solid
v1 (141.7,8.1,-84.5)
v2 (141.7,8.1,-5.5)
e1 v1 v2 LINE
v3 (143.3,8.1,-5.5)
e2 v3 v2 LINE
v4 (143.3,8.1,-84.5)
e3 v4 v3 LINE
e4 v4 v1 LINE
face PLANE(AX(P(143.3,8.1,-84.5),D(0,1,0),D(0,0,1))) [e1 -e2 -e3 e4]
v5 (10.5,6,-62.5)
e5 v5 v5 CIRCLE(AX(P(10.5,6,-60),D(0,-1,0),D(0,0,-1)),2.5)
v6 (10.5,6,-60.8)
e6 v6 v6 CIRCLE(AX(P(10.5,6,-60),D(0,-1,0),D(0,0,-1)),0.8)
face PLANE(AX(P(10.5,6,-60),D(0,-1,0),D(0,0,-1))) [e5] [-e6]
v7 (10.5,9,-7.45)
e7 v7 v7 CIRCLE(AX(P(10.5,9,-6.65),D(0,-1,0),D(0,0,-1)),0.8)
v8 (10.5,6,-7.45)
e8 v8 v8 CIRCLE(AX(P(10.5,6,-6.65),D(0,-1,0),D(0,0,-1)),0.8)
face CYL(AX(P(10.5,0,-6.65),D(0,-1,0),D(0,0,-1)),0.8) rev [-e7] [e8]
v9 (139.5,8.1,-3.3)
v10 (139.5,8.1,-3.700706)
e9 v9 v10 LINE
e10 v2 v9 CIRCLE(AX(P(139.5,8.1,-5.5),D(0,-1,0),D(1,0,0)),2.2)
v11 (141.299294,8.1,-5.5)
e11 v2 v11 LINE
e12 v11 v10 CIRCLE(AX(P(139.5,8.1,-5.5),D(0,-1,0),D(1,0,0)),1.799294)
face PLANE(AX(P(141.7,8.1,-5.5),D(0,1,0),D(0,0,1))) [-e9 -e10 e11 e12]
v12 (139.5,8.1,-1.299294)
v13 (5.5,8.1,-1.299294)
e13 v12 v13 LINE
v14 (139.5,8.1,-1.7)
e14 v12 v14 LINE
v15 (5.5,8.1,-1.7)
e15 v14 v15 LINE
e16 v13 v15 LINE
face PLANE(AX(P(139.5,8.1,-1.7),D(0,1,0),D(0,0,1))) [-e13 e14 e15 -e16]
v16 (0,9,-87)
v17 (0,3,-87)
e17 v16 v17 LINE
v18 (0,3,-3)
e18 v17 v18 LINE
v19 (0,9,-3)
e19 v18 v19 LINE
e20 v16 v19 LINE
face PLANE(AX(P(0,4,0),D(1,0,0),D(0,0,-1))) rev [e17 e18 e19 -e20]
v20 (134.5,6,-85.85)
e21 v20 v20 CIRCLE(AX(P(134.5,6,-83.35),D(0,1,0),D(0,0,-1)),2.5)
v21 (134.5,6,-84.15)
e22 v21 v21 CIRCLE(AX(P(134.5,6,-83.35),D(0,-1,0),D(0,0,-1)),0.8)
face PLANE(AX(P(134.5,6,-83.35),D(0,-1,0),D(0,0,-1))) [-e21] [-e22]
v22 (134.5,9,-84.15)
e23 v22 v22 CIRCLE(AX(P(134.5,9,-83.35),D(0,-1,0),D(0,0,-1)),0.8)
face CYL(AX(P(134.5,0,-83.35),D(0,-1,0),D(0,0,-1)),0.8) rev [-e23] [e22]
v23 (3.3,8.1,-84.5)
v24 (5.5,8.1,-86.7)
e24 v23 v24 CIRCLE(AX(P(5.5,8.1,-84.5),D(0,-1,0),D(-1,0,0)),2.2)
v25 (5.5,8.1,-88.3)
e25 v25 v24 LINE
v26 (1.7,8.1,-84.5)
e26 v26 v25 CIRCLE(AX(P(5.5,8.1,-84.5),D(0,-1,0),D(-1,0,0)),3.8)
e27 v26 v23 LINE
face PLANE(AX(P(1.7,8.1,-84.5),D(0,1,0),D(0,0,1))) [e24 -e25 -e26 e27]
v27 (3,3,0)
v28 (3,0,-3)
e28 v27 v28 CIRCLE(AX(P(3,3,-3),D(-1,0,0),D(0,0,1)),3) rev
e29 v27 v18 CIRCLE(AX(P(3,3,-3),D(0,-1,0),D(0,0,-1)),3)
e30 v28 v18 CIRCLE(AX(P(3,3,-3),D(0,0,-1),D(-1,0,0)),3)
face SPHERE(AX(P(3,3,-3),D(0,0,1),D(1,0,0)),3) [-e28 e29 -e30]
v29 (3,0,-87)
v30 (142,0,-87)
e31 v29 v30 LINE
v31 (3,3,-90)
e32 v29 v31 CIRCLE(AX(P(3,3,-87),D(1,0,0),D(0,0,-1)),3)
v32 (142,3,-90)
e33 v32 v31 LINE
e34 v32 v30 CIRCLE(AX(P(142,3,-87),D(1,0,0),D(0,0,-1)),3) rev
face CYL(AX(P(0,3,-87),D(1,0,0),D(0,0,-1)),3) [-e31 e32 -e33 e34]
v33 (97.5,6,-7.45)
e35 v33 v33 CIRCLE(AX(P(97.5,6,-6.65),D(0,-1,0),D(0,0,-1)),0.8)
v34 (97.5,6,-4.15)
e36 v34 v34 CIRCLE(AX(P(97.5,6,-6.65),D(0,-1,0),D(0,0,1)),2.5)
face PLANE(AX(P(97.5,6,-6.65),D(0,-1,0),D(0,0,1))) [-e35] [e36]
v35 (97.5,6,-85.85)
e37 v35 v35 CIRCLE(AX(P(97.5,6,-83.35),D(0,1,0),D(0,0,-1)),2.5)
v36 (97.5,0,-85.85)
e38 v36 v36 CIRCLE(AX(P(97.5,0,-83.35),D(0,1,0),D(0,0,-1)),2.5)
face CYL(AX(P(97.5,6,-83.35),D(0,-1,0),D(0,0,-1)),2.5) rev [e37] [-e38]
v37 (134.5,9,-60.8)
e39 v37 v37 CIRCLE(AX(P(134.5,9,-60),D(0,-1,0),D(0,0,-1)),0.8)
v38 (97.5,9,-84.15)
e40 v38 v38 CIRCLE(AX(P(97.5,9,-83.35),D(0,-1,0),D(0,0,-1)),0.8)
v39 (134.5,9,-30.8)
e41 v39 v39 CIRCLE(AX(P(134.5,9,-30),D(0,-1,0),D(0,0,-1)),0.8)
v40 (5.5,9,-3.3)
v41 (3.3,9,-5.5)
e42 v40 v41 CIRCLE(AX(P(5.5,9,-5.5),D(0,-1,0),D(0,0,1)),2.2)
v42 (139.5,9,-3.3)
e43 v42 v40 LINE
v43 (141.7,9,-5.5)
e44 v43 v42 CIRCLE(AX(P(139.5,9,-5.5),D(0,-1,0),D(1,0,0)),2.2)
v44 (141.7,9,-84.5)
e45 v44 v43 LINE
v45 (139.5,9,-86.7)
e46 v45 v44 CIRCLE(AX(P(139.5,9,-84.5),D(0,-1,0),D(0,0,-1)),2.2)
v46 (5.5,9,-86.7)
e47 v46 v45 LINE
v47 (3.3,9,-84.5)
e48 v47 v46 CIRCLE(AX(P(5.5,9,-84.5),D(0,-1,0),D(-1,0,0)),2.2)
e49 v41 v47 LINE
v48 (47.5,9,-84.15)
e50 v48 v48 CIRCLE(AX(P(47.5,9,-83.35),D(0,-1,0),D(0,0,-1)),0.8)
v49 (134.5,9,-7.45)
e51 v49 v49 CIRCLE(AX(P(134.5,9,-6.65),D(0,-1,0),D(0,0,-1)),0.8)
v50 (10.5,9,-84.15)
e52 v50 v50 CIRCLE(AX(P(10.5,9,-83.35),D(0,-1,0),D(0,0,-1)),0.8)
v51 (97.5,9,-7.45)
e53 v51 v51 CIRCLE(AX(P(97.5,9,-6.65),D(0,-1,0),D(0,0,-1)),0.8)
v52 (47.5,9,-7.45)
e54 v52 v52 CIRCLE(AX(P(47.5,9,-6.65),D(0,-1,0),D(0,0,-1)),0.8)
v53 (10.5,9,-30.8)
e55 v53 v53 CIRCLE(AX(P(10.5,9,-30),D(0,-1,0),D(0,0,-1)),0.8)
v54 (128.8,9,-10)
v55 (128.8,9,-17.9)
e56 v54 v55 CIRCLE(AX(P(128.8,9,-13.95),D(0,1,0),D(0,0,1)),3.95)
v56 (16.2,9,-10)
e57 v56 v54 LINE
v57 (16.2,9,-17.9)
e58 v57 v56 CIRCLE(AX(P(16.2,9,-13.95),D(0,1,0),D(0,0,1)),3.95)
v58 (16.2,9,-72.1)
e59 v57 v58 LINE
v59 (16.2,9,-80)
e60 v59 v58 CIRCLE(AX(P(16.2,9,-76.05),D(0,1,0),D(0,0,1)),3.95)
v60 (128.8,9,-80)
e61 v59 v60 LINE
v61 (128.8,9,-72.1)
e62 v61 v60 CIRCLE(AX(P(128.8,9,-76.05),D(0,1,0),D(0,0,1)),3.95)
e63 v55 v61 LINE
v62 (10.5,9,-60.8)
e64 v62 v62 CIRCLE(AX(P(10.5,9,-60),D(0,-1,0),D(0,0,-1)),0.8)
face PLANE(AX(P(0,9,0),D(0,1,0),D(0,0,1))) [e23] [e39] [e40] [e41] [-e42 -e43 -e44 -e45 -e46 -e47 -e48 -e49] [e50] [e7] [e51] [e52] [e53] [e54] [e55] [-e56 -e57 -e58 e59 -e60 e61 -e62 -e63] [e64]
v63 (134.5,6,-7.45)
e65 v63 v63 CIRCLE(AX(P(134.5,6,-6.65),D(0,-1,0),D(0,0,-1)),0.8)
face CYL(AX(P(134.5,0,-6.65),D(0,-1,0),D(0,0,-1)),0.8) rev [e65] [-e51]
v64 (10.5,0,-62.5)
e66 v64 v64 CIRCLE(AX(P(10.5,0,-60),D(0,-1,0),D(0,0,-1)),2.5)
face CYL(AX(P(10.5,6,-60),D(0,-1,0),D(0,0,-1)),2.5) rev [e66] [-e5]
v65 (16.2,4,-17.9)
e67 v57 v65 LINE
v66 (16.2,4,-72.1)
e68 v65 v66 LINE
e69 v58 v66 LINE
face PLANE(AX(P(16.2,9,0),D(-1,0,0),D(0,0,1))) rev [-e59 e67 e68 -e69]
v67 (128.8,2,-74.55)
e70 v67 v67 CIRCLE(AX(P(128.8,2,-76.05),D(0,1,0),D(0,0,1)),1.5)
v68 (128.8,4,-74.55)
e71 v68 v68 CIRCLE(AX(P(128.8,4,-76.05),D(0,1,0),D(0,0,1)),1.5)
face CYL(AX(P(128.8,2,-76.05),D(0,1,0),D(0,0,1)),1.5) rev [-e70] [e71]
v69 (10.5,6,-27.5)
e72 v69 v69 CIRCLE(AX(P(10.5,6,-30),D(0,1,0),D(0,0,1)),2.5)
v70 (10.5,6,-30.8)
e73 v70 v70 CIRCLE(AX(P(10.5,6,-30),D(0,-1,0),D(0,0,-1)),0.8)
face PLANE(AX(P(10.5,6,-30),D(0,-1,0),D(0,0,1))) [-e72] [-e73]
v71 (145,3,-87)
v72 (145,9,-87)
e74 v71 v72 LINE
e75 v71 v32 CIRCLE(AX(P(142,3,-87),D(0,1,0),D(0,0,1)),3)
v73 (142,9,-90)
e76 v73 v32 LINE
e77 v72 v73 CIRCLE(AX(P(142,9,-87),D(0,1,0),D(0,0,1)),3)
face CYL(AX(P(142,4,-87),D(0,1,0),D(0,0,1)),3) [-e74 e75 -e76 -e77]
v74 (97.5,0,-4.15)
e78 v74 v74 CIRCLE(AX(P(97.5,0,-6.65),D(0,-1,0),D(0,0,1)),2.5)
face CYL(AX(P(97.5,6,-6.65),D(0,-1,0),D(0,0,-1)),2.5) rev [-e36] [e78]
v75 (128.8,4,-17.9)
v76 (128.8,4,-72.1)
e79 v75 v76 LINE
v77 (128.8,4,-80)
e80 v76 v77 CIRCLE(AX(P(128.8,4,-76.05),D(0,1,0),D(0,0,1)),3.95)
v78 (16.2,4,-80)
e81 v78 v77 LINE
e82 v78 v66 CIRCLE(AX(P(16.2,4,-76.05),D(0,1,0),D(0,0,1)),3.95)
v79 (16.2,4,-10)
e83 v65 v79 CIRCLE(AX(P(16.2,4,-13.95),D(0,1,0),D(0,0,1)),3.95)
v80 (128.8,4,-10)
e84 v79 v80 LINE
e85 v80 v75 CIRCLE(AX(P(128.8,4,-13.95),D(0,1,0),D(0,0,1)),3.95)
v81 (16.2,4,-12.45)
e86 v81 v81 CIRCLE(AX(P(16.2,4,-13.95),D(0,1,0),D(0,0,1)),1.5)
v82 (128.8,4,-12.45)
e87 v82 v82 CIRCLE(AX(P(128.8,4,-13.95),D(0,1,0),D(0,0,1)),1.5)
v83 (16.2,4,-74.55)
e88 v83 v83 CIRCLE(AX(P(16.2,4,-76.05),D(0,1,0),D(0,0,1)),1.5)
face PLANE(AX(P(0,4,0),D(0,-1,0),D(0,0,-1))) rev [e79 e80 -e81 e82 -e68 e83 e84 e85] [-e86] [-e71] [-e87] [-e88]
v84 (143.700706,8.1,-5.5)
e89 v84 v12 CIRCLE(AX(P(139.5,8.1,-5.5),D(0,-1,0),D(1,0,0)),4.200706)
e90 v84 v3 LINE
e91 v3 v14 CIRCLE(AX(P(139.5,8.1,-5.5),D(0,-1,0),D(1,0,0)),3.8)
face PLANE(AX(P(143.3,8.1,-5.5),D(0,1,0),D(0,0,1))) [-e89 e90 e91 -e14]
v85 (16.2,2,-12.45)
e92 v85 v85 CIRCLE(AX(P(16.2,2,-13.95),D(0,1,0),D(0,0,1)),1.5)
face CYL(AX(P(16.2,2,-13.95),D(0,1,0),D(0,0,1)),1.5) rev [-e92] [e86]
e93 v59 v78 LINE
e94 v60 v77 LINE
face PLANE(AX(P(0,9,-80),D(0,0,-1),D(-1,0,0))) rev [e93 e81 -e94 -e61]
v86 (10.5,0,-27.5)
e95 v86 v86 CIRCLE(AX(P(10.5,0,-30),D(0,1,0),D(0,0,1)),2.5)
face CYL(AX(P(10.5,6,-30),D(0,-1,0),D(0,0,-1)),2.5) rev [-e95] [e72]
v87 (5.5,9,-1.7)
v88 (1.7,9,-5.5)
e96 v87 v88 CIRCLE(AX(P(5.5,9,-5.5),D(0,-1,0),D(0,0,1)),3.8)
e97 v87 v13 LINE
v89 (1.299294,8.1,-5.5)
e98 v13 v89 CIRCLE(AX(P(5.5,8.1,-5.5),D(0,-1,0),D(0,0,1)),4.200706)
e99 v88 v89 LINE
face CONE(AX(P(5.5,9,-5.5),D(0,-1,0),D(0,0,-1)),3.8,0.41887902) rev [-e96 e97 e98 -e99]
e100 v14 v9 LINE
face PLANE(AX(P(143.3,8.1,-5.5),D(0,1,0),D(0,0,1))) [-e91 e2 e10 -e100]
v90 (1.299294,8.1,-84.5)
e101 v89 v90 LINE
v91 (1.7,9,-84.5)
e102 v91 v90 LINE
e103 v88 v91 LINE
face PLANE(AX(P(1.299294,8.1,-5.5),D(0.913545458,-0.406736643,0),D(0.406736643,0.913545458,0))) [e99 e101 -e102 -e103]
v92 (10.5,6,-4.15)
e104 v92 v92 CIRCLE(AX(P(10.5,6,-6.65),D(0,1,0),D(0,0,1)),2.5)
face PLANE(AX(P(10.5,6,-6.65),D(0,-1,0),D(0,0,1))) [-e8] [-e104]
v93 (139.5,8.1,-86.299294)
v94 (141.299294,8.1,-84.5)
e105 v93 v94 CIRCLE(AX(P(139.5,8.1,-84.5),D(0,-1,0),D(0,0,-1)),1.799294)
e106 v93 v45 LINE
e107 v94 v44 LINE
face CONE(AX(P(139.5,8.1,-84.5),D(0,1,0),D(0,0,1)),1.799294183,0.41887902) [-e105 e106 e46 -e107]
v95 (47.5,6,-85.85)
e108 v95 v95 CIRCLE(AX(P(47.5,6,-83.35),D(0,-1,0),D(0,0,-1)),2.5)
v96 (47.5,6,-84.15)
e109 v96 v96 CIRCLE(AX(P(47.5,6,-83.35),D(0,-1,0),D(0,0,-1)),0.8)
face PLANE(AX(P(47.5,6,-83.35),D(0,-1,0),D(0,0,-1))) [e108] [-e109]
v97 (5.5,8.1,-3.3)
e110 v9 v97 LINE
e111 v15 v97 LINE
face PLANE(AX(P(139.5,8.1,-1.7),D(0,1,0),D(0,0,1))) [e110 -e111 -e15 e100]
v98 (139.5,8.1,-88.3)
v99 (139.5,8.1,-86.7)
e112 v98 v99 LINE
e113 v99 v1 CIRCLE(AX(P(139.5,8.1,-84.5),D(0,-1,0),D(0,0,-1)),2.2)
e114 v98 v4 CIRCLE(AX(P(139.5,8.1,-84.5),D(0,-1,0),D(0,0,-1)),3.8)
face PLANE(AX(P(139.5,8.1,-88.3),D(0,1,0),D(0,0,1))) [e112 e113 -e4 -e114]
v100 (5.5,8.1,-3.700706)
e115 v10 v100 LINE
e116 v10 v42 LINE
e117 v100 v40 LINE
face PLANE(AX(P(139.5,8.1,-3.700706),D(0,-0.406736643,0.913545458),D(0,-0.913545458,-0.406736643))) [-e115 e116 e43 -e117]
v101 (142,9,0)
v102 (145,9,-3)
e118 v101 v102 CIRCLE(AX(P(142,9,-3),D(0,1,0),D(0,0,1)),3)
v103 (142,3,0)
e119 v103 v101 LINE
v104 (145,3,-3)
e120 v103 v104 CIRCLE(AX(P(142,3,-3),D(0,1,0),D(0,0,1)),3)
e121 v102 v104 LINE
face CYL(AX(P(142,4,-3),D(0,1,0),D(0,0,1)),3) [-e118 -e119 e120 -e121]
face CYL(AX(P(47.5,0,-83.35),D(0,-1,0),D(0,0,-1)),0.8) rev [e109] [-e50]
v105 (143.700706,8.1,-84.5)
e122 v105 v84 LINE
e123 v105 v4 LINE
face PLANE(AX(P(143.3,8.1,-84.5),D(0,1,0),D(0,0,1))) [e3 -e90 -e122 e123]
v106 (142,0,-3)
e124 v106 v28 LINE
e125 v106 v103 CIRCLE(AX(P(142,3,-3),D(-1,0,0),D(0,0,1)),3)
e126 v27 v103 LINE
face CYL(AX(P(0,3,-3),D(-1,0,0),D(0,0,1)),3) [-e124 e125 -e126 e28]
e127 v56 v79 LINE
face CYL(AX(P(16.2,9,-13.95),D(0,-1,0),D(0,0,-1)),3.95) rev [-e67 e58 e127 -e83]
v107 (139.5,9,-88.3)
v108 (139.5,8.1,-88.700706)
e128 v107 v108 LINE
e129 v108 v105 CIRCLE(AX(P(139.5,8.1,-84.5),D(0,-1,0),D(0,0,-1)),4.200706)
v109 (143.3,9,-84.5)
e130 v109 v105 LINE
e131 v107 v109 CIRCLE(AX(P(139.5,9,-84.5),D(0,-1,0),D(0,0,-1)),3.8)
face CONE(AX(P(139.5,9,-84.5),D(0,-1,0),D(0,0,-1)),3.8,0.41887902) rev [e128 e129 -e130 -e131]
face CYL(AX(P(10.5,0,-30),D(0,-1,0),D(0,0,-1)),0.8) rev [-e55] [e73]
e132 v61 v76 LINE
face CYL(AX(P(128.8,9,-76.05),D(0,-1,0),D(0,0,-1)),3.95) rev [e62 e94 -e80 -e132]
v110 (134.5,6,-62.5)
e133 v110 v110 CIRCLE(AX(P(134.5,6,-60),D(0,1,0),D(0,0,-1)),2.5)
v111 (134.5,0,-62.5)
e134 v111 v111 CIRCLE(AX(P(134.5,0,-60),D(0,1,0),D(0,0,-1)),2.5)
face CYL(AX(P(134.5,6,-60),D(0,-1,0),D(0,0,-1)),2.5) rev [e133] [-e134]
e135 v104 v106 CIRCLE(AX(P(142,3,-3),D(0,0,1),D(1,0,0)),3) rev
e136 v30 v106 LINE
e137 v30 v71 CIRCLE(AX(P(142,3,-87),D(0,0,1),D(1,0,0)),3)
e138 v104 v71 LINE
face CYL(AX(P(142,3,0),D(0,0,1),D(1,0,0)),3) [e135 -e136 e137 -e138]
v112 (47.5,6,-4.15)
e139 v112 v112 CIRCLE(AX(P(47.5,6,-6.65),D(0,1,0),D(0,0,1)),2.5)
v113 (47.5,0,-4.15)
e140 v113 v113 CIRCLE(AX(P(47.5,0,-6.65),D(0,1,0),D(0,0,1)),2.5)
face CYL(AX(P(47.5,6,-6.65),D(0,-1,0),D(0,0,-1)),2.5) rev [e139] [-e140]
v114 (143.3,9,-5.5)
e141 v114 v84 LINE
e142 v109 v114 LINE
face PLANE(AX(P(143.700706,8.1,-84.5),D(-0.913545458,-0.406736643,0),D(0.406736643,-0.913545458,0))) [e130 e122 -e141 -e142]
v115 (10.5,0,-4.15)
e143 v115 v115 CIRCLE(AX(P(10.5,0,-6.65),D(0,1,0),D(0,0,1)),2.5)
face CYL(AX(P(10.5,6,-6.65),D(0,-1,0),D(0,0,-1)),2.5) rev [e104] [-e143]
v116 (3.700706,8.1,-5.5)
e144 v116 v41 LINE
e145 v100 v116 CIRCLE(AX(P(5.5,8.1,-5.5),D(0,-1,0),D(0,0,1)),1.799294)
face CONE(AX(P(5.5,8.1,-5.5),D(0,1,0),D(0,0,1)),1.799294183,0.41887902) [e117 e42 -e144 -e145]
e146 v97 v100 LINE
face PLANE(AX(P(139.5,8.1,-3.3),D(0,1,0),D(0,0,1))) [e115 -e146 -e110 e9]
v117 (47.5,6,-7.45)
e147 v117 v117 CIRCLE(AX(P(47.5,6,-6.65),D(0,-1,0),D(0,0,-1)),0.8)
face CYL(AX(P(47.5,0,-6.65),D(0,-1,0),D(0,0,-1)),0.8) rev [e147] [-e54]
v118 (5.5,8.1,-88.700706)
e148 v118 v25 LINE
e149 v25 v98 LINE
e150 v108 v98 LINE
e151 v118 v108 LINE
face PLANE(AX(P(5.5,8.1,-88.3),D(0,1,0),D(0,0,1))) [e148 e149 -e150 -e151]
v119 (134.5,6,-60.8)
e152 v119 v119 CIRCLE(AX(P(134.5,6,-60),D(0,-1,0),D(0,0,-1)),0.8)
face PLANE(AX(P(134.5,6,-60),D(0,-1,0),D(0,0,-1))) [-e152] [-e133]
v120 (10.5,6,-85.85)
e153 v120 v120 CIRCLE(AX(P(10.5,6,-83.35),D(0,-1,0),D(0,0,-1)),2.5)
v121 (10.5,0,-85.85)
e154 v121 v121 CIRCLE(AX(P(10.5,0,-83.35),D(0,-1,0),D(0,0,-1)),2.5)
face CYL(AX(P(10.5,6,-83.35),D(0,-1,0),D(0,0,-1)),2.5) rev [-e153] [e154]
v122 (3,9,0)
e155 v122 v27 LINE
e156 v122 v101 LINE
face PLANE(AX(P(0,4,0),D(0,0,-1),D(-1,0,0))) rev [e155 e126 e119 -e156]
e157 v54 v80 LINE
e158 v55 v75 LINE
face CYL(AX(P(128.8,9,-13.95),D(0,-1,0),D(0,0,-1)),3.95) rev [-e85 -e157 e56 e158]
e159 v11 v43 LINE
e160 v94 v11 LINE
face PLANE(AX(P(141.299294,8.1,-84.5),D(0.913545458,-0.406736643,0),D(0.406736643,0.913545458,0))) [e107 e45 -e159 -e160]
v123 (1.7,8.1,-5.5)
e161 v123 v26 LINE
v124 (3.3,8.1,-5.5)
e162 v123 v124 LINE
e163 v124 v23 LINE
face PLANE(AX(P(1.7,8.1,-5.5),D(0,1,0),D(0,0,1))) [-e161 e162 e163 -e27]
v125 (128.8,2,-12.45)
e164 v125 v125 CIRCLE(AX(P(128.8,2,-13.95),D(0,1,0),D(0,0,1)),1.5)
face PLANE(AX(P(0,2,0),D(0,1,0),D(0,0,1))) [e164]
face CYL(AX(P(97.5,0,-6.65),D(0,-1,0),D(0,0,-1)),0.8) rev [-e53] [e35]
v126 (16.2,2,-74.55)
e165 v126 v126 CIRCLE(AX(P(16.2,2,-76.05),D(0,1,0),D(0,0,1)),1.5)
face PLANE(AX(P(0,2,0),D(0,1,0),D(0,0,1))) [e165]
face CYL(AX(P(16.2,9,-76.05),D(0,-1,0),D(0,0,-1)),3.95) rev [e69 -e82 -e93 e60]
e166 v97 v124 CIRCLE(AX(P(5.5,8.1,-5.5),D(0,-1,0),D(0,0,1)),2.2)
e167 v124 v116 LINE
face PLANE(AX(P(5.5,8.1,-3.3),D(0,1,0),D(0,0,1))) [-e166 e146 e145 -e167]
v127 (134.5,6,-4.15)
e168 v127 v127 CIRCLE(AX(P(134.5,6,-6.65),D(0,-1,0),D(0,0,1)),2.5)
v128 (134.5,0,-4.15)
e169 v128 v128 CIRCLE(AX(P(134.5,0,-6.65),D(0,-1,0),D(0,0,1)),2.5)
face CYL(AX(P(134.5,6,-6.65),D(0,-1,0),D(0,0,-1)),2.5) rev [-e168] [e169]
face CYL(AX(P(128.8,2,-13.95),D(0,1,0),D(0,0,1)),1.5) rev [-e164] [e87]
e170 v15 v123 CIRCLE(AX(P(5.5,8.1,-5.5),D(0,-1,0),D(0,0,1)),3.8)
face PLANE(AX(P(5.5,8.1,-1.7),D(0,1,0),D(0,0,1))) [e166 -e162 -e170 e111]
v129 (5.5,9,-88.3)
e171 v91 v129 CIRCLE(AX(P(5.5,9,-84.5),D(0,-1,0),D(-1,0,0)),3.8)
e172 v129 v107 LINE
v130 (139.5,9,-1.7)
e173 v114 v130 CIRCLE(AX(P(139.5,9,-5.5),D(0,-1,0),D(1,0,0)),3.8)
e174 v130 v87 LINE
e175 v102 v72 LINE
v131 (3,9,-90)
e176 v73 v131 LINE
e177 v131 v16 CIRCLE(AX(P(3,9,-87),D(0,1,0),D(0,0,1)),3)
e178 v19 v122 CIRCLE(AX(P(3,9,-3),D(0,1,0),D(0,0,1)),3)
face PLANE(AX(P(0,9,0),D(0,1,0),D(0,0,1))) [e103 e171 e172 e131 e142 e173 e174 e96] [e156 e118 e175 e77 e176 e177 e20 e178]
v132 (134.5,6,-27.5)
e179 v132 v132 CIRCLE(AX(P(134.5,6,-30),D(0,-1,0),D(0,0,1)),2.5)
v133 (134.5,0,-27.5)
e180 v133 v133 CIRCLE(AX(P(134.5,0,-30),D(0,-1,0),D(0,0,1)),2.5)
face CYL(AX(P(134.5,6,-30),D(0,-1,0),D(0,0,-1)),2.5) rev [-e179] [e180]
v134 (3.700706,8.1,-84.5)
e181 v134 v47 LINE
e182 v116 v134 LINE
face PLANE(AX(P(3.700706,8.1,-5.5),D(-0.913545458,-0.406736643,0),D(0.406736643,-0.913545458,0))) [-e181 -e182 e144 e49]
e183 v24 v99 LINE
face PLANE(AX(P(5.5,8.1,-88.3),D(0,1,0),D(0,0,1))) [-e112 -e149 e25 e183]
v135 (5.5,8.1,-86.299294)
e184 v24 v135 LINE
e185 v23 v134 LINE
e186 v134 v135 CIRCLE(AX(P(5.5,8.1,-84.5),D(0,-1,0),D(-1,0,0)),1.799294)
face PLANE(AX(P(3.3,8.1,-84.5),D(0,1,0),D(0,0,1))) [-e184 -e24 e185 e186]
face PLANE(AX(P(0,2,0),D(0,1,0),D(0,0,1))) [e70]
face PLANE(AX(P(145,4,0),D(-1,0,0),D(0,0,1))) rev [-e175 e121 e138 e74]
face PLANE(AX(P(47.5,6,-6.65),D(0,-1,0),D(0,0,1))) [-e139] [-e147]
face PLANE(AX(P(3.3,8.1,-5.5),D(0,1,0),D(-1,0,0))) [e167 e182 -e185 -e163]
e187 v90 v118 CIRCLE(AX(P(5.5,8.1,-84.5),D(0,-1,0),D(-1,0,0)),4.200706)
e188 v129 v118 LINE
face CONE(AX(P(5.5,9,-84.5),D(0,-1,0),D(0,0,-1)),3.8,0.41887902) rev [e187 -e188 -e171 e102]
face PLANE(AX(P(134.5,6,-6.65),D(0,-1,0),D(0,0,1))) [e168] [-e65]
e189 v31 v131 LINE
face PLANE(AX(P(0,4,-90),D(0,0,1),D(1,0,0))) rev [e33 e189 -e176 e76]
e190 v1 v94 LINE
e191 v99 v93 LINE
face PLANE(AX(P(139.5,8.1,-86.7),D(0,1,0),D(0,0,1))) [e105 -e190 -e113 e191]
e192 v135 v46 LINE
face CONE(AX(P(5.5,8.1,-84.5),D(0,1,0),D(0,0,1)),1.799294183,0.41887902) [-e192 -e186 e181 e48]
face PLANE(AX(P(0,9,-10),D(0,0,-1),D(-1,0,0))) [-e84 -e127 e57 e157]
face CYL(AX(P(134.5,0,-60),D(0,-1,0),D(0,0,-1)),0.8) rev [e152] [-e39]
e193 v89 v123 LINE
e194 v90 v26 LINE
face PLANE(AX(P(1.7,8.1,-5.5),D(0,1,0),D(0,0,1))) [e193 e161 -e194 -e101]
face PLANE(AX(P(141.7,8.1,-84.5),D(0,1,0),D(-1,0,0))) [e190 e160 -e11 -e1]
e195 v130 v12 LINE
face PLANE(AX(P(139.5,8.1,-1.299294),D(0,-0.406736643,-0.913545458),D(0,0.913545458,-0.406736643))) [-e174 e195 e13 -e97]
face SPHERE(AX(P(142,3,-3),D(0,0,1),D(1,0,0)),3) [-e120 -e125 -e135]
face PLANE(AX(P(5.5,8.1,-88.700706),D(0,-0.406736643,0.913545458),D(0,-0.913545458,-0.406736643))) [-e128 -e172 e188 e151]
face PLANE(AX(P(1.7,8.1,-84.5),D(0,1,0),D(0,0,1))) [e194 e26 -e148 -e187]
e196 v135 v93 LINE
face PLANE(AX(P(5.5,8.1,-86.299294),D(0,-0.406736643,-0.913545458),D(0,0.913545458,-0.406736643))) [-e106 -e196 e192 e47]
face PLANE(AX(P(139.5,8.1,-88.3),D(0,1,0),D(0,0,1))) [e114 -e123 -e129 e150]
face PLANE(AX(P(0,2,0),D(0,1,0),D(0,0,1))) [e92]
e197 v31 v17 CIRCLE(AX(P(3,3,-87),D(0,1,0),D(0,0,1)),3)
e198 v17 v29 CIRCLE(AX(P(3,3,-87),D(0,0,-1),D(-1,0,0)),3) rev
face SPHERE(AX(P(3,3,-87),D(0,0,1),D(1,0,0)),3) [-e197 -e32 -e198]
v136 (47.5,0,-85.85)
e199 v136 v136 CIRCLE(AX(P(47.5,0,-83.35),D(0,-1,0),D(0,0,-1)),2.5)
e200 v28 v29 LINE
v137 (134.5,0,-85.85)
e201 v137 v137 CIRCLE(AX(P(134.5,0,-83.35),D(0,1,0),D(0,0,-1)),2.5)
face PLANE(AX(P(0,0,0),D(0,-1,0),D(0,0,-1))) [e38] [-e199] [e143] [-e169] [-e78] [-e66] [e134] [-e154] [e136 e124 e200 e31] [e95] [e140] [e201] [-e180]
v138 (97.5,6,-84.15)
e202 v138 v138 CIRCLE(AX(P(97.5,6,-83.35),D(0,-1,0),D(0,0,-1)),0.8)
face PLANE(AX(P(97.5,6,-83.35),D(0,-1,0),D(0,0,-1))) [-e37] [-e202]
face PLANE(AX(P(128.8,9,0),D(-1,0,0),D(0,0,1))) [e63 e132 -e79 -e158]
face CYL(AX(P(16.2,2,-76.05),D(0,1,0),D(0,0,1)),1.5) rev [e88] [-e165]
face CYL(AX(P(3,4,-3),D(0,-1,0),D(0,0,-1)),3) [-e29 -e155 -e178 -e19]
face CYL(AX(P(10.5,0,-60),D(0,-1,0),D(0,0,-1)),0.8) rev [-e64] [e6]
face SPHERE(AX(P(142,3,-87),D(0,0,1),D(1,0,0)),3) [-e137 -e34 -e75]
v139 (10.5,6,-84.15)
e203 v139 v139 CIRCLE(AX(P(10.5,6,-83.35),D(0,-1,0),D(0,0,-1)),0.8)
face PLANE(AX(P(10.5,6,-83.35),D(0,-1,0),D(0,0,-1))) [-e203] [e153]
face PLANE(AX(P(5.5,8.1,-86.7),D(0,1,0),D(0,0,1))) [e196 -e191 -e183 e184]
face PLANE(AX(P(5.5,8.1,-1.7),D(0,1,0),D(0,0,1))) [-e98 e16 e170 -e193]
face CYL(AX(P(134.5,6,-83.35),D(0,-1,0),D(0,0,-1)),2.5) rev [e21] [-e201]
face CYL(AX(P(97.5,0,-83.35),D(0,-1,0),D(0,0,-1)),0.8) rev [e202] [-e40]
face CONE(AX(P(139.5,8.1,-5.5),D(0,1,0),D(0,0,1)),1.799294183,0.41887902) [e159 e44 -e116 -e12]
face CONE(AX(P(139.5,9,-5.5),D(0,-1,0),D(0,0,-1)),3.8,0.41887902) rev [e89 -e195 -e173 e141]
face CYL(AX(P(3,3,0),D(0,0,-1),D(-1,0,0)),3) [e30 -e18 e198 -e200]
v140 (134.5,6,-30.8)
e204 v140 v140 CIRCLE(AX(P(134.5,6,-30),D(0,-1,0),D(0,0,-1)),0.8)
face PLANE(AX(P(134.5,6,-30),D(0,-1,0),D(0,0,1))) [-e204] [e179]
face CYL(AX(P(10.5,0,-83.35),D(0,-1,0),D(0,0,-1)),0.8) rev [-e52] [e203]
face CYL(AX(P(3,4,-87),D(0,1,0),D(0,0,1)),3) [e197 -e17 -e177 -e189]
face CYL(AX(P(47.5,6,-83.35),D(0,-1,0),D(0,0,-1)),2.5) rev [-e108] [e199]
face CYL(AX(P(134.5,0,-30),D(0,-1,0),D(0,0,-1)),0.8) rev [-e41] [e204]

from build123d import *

# Parameters (mm, degrees)
SKETCH1_W               = 145
SKETCH1_H               = 90
BOSS_EXTRUDE1_DEPTH     = 4
SKETCH3_W               = 145
SKETCH3_H               = 90
SKETCH3_W_2             = 135
SKETCH3_H_2             = 80
BOSS_EXTRUDE2_DEPTH     = 5
BOSS_EXTRUDE4_DEPTH     = 5
FILLET1_R               = 3
FILLET3_R               = 3
FILLET4_R               = 3
FILLET5_R               = 3
FILLET6_R               = 3
CUT_EXTRUDE1_DEPTH      = 2
SKETCH11_R              = 2.5
CUT_EXTRUDE2_DEPTH      = 6
M2X0_4_TAPPED_HOLE1_D   = 1.6
MIRROR5_COPY_1_SKETCH_R = 2.5
MIRROR5_COPY_1_DEPTH    = 6
MIRROR5_COPY_2_D        = 1.6


with BuildPart() as part:
    # Sketch1 → Boss-Extrude1 (new body)
    with BuildSketch(Plane(origin=(0, 0, 0), x_dir=(1, 0, 0), z_dir=(0, 1, 0))):
        with Locations((72.5, 45)):
            Rectangle(SKETCH1_W, SKETCH1_H)
    extrude(amount=BOSS_EXTRUDE1_DEPTH)

    # Sketch3 → Boss-Extrude2 (add)
    with BuildSketch(Plane(origin=(0, 4, 0), x_dir=(1, 0, 0), z_dir=(0, 1, 0))):
        with Locations((72.5, 45)):
            Rectangle(SKETCH3_W, SKETCH3_H)
        with Locations((72.5, 45)):
            Rectangle(SKETCH3_W_2, SKETCH3_H_2, mode=Mode.SUBTRACT)
    extrude(amount=BOSS_EXTRUDE2_DEPTH)

    # Sketch5<4> → Boss-Extrude4 (add)
    with BuildSketch(Plane(origin=(0, 4, 0), x_dir=(1, 0, 0), z_dir=(0, 1, 0))):
        with BuildLine():
            Line((72.5, 80), (72.5, 85))
            Line((72.5, 85), (5, 85))
            Line((5, 85), (5, 45))
            Line((5, 45), (16.2, 45))
            Line((16.2, 45), (16.2, 72.1))
            ThreePointArc((16.2, 72.1), (12.25, 76.05), (16.2, 80))
            Line((16.2, 80), (72.5, 80))
        make_face()
        with BuildLine():
            Line((16.2, 45), (5, 45))
            Line((5, 45), (5, 5))
            Line((5, 5), (72.5, 5))
            Line((72.5, 5), (72.5, 10))
            Line((72.5, 10), (16.2, 10))
            ThreePointArc((16.2, 10), (12.25, 13.95), (16.2, 17.9))
            Line((16.2, 17.9), (16.2, 45))
        make_face()
        with BuildLine():
            Line((140, 5), (140, 45))
            Line((140, 45), (128.8, 45))
            Line((128.8, 45), (128.8, 17.9))
            ThreePointArc((128.8, 17.9), (131.593071786, 16.743071786), (132.75, 13.95))
            ThreePointArc((132.75, 13.95), (131.593071786, 11.156928214), (128.8, 10))
            Line((128.8, 10), (72.5, 10))
            Line((72.5, 10), (72.5, 5))
            Line((72.5, 5), (140, 5))
        make_face()
        with BuildLine():
            Line((140, 85), (72.5, 85))
            Line((72.5, 85), (72.5, 80))
            Line((72.5, 80), (128.8, 80))
            ThreePointArc((128.8, 80), (131.593071786, 78.843071786), (132.75, 76.05))
            ThreePointArc((132.75, 76.05), (131.593071786, 73.256928214), (128.8, 72.1))
            Line((128.8, 72.1), (128.8, 45))
            Line((128.8, 45), (140, 45))
            Line((140, 45), (140, 85))
        make_face()
    extrude(amount=BOSS_EXTRUDE4_DEPTH)

    # Fillet1
    fillet1_edges = [part.edges().sort_by_distance(p)[0] for p in [
        (72.5, 0, -90),
        (145, 0, -45),
        (72.5, 0, 0),
        (0, 0, -45),
    ]]
    fillet(fillet1_edges, radius=FILLET1_R)

    # Fillet3
    # the kernel refuses this fillet: 3 mm, written as the material it takes off along each edge
    with BuildSketch(Plane(origin=(3, 3, -87), x_dir=(0, 0, -1), z_dir=(-1, 0, 0))) as fillet3_piece_1_section:
        Polygon((0, 0), (FILLET3_R, 0), (FILLET3_R, FILLET3_R), (0, FILLET3_R), align=None)
    fillet3_piece_1 = extrude(amount=FILLET3_R, mode=Mode.PRIVATE)
    fillet3_piece_1 = fillet3_piece_1 - Plane(origin=(3, 3, -87), x_dir=(0, 0.7071067811865475, 0.7071067811865475), z_dir=(-1, 0, 0)) * Sphere(FILLET3_R, mode=Mode.PRIVATE)
    add(fillet3_piece_1, mode=Mode.SUBTRACT)
    with BuildSketch(Plane(origin=(0, 16.5, -90), x_dir=(0, 0, 1), z_dir=(0, -1, 0))) as fillet3_piece_2:
        with BuildLine():
            CenterArc((FILLET3_R, -FILLET3_R), FILLET3_R, 90, 90)
            Line((0, -FILLET3_R), (0, 0))
            Line((0, 0), (FILLET3_R, 0))
        make_face()
    extrude(amount=13.5, mode=Mode.SUBTRACT)

    # Fillet4
    # the kernel refuses this fillet: 3 mm, written as the material it takes off along each edge
    with BuildSketch(Plane(origin=(142, 3, -87), x_dir=(0, 0, -1), z_dir=(1, 0, 0))) as fillet4_piece_1_section:
        Polygon((0, 0), (FILLET4_R, 0), (FILLET4_R, -FILLET4_R), (0, -FILLET4_R), align=None)
    fillet4_piece_1 = extrude(amount=FILLET4_R, mode=Mode.PRIVATE)
    fillet4_piece_1 = fillet4_piece_1 - Plane(origin=(142, 3, -87), x_dir=(0, 0.7071067811865475, 0.7071067811865475), z_dir=(1, 0, 0)) * Sphere(FILLET4_R, mode=Mode.PRIVATE)
    add(fillet4_piece_1, mode=Mode.SUBTRACT)
    with BuildSketch(Plane(origin=(145, 3, -90), x_dir=(0, 0, 1), z_dir=(0, 1, 0))) as fillet4_piece_2:
        with BuildLine():
            CenterArc((FILLET4_R, -FILLET4_R), FILLET4_R, 90, 90)
            Line((0, -FILLET4_R), (0, 0))
            Line((0, 0), (FILLET4_R, 0))
        make_face()
    extrude(amount=13.5, mode=Mode.SUBTRACT)

    # Fillet5
    # the kernel refuses this fillet: 3 mm, written as the material it takes off along each edge
    with BuildSketch(Plane(origin=(142, 3, -3), x_dir=(1, 0, 0), z_dir=(0, 0, 1))) as fillet5_piece_1_section:
        Polygon((0, 0), (FILLET5_R, 0), (FILLET5_R, -FILLET5_R), (0, -FILLET5_R), align=None)
    fillet5_piece_1 = extrude(amount=FILLET5_R, mode=Mode.PRIVATE)
    fillet5_piece_1 = fillet5_piece_1 - Plane(origin=(142, 3, -3), x_dir=(-0.7071067811865475, 0.7071067811865475, 0), z_dir=(0, 0, 1)) * Sphere(FILLET5_R, mode=Mode.PRIVATE)
    add(fillet5_piece_1, mode=Mode.SUBTRACT)
    with BuildSketch(Plane(origin=(145, 3, 0), x_dir=(-1, 0, 0), z_dir=(0, 1, 0))) as fillet5_piece_2:
        with BuildLine():
            CenterArc((FILLET5_R, -FILLET5_R), FILLET5_R, 90, 90)
            Line((0, -FILLET5_R), (0, 0))
            Line((0, 0), (FILLET5_R, 0))
        make_face()
    extrude(amount=13.5, mode=Mode.SUBTRACT)

    # Fillet6
    # the kernel refuses this fillet: 3 mm, written as the material it takes off along each edge
    with BuildSketch(Plane(origin=(3, 3, -3), x_dir=(-1, 0, 0), z_dir=(0, 0, 1))) as fillet6_piece_1_section:
        Polygon((0, 0), (FILLET6_R, 0), (FILLET6_R, FILLET6_R), (0, FILLET6_R), align=None)
    fillet6_piece_1 = extrude(amount=FILLET6_R, mode=Mode.PRIVATE)
    fillet6_piece_1 = fillet6_piece_1 - Plane(origin=(3, 3, -3), x_dir=(0.7071067811865475, 0.7071067811865475, 0), z_dir=(0, 0, 1)) * Sphere(FILLET6_R, mode=Mode.PRIVATE)
    add(fillet6_piece_1, mode=Mode.SUBTRACT)
    with BuildSketch(Plane(origin=(0, 16.5, 0), x_dir=(1, 0, 0), z_dir=(0, -1, 0))) as fillet6_piece_2:
        with BuildLine():
            CenterArc((FILLET6_R, -FILLET6_R), FILLET6_R, 90, 90)
            Line((0, -FILLET6_R), (0, 0))
            Line((0, 0), (FILLET6_R, 0))
        make_face()
    extrude(amount=13.5, mode=Mode.SUBTRACT)

    # Sketch5 → Cut-Extrude1 (cut)
    with BuildSketch(Plane(origin=(0, 4, 0), x_dir=(1, 0, 0), z_dir=(0, 1, 0))):
        with BuildLine():
            ThreePointArc((130.3, 13.95), (129.860660172, 15.010660172), (128.8, 15.45))
            Line((128.8, 15.45), (128.8, 13.95))
            Line((128.8, 13.95), (127.3, 13.95))
            ThreePointArc((127.3, 13.95), (128.8, 12.45), (130.3, 13.95))
        make_face()
        with BuildLine():
            Line((128.8, 13.95), (128.8, 15.45))
            ThreePointArc((128.8, 15.45), (127.739339828, 15.010660172), (127.3, 13.95))
            Line((127.3, 13.95), (128.8, 13.95))
        make_face()
        with BuildLine():
            ThreePointArc((130.3, 76.05), (128.8, 77.55), (127.3, 76.05))
            Line((127.3, 76.05), (128.8, 76.05))
            Line((128.8, 76.05), (128.8, 74.55))
            ThreePointArc((128.8, 74.55), (129.860660172, 74.989339828), (130.3, 76.05))
        make_face()
        with BuildLine():
            Line((128.8, 76.05), (127.3, 76.05))
            ThreePointArc((127.3, 76.05), (127.739339828, 74.989339828), (128.8, 74.55))
            Line((128.8, 74.55), (128.8, 76.05))
        make_face()
        with BuildLine():
            ThreePointArc((16.2, 74.55), (17.260660172, 74.989339828), (17.7, 76.05))
            Line((17.7, 76.05), (16.2, 76.05))
            Line((16.2, 76.05), (16.2, 74.55))
        make_face()
        with BuildLine():
            Line((16.2, 76.05), (17.7, 76.05))
            ThreePointArc((17.7, 76.05), (15.139339828, 77.110660172), (16.2, 74.55))
            Line((16.2, 74.55), (16.2, 76.05))
        make_face()
        with BuildLine():
            ThreePointArc((17.7, 13.95), (17.260660172, 15.010660172), (16.2, 15.45))
            Line((16.2, 15.45), (16.2, 13.95))
            Line((16.2, 13.95), (17.7, 13.95))
        make_face()
        with BuildLine():
            Line((16.2, 13.95), (16.2, 15.45))
            ThreePointArc((16.2, 15.45), (15.139339828, 12.889339828), (17.7, 13.95))
            Line((17.7, 13.95), (16.2, 13.95))
        make_face()
    extrude(amount=-CUT_EXTRUDE1_DEPTH, mode=Mode.SUBTRACT)

    # Sketch11 → Cut-Extrude2 (cut)
    with BuildSketch(Plane.XZ):
        with Locations(Location((10.5, -83.35, 0), (0, 0, 270))):
            Circle(SKETCH11_R)
        with Locations(Location((47.5, -83.35, 0), (0, 0, 270))):
            Circle(SKETCH11_R)
        with Locations(Location((10.5, -60, 0), (0, 0, 270))):
            Circle(SKETCH11_R)
    cut_extrude2 = extrude(amount=-CUT_EXTRUDE2_DEPTH, mode=Mode.SUBTRACT)

    # M2x0.4 Tapped Hole1 (through all)
    with Locations(Plane(origin=(0, 0, 0), x_dir=(-1, 0, 0), z_dir=(0, -1, 0))):
        with Locations((-10.5, 60), (-47.5, 83.35), (-10.5, 83.35)):
            m2x0_4_tapped_hole1 = Hole(M2X0_4_TAPPED_HOLE1_D / 2)

    # Cut-Sweep1: sweep along a path in Sketch6
    with BuildLine(Plane(origin=(0, 9, 0), x_dir=(1, 0, 0), z_dir=(0, 1, 0))) as cut_sweep1_path:
        Line((139.5, 87.5), (5.5, 87.5))
        ThreePointArc((5.5, 87.5), (3.378679656, 86.621320344), (2.5, 84.5))
        Line((2.5, 84.5), (2.5, 5.5))
        ThreePointArc((2.5, 5.5), (3.378679656, 3.378679656), (5.5, 2.5))
        Line((5.5, 2.5), (139.5, 2.5))
        ThreePointArc((139.5, 2.5), (141.621320344, 3.378679656), (142.5, 5.5))
        Line((142.5, 5.5), (142.5, 84.5))
        ThreePointArc((142.5, 84.5), (141.621320344, 86.621320344), (139.5, 87.5))
    # Sketch7 → Cut-Sweep1 (sweep, cut)
    with BuildSketch(Plane(origin=(5.5, 0, 0), x_dir=(0, 0, -1), z_dir=(1, 0, 0))):
        Polygon((1.7, 9), (3.3, 9), (3.700705817, 8.1), (3.3, 8.1), (1.7, 8.1), (1.299294183, 8.1), align=None)
    sweep(path=cut_sweep1_path.line, mode=Mode.SUBTRACT)

    # Mirror4: Cut-Extrude2, M2x0.4 Tapped Hole1 across plane
    add(cut_extrude2.mirror(Plane(origin=(72.5, 0, 0), x_dir=(0, 0, 1), z_dir=(1, 0, 0))), mode=Mode.SUBTRACT)
    add(m2x0_4_tapped_hole1.mirror(Plane(origin=(72.5, 0, 0), x_dir=(0, 0, 1), z_dir=(1, 0, 0))), mode=Mode.SUBTRACT)

    # Mirror5: Cut-Extrude2, M2x0.4 Tapped Hole1 across plane
    add(cut_extrude2.mirror(Plane.XY.offset(-45)), mode=Mode.SUBTRACT)
    add(m2x0_4_tapped_hole1.mirror(Plane.XY.offset(-45)), mode=Mode.SUBTRACT)

    # Mirror5 copy 1 sketch → Mirror5 copy 1 (cut)
    with BuildSketch(Plane(origin=(145, 0, -90), x_dir=(-1, 0, 0), z_dir=(0, -1, 0))):
        with Locations(Location((10.5, -83.35, 0), (0, 0, 270))):
            Circle(MIRROR5_COPY_1_SKETCH_R)
        with Locations(Location((47.5, -83.35, 0), (0, 0, 270))):
            Circle(MIRROR5_COPY_1_SKETCH_R)
        with Locations(Location((10.5, -60, 0), (0, 0, 270))):
            Circle(MIRROR5_COPY_1_SKETCH_R)
    extrude(amount=-MIRROR5_COPY_1_DEPTH, mode=Mode.SUBTRACT)

    # Mirror5 copy 2 (through all)
    with Locations(Plane(origin=(145, 0, -90), x_dir=(1, 0, 0), z_dir=(0, -1, 0))):
        with Locations((-10.5, 60), (-47.5, 83.35), (-10.5, 83.35)):
            Hole(MIRROR5_COPY_2_D / 2)


solid = part.part
